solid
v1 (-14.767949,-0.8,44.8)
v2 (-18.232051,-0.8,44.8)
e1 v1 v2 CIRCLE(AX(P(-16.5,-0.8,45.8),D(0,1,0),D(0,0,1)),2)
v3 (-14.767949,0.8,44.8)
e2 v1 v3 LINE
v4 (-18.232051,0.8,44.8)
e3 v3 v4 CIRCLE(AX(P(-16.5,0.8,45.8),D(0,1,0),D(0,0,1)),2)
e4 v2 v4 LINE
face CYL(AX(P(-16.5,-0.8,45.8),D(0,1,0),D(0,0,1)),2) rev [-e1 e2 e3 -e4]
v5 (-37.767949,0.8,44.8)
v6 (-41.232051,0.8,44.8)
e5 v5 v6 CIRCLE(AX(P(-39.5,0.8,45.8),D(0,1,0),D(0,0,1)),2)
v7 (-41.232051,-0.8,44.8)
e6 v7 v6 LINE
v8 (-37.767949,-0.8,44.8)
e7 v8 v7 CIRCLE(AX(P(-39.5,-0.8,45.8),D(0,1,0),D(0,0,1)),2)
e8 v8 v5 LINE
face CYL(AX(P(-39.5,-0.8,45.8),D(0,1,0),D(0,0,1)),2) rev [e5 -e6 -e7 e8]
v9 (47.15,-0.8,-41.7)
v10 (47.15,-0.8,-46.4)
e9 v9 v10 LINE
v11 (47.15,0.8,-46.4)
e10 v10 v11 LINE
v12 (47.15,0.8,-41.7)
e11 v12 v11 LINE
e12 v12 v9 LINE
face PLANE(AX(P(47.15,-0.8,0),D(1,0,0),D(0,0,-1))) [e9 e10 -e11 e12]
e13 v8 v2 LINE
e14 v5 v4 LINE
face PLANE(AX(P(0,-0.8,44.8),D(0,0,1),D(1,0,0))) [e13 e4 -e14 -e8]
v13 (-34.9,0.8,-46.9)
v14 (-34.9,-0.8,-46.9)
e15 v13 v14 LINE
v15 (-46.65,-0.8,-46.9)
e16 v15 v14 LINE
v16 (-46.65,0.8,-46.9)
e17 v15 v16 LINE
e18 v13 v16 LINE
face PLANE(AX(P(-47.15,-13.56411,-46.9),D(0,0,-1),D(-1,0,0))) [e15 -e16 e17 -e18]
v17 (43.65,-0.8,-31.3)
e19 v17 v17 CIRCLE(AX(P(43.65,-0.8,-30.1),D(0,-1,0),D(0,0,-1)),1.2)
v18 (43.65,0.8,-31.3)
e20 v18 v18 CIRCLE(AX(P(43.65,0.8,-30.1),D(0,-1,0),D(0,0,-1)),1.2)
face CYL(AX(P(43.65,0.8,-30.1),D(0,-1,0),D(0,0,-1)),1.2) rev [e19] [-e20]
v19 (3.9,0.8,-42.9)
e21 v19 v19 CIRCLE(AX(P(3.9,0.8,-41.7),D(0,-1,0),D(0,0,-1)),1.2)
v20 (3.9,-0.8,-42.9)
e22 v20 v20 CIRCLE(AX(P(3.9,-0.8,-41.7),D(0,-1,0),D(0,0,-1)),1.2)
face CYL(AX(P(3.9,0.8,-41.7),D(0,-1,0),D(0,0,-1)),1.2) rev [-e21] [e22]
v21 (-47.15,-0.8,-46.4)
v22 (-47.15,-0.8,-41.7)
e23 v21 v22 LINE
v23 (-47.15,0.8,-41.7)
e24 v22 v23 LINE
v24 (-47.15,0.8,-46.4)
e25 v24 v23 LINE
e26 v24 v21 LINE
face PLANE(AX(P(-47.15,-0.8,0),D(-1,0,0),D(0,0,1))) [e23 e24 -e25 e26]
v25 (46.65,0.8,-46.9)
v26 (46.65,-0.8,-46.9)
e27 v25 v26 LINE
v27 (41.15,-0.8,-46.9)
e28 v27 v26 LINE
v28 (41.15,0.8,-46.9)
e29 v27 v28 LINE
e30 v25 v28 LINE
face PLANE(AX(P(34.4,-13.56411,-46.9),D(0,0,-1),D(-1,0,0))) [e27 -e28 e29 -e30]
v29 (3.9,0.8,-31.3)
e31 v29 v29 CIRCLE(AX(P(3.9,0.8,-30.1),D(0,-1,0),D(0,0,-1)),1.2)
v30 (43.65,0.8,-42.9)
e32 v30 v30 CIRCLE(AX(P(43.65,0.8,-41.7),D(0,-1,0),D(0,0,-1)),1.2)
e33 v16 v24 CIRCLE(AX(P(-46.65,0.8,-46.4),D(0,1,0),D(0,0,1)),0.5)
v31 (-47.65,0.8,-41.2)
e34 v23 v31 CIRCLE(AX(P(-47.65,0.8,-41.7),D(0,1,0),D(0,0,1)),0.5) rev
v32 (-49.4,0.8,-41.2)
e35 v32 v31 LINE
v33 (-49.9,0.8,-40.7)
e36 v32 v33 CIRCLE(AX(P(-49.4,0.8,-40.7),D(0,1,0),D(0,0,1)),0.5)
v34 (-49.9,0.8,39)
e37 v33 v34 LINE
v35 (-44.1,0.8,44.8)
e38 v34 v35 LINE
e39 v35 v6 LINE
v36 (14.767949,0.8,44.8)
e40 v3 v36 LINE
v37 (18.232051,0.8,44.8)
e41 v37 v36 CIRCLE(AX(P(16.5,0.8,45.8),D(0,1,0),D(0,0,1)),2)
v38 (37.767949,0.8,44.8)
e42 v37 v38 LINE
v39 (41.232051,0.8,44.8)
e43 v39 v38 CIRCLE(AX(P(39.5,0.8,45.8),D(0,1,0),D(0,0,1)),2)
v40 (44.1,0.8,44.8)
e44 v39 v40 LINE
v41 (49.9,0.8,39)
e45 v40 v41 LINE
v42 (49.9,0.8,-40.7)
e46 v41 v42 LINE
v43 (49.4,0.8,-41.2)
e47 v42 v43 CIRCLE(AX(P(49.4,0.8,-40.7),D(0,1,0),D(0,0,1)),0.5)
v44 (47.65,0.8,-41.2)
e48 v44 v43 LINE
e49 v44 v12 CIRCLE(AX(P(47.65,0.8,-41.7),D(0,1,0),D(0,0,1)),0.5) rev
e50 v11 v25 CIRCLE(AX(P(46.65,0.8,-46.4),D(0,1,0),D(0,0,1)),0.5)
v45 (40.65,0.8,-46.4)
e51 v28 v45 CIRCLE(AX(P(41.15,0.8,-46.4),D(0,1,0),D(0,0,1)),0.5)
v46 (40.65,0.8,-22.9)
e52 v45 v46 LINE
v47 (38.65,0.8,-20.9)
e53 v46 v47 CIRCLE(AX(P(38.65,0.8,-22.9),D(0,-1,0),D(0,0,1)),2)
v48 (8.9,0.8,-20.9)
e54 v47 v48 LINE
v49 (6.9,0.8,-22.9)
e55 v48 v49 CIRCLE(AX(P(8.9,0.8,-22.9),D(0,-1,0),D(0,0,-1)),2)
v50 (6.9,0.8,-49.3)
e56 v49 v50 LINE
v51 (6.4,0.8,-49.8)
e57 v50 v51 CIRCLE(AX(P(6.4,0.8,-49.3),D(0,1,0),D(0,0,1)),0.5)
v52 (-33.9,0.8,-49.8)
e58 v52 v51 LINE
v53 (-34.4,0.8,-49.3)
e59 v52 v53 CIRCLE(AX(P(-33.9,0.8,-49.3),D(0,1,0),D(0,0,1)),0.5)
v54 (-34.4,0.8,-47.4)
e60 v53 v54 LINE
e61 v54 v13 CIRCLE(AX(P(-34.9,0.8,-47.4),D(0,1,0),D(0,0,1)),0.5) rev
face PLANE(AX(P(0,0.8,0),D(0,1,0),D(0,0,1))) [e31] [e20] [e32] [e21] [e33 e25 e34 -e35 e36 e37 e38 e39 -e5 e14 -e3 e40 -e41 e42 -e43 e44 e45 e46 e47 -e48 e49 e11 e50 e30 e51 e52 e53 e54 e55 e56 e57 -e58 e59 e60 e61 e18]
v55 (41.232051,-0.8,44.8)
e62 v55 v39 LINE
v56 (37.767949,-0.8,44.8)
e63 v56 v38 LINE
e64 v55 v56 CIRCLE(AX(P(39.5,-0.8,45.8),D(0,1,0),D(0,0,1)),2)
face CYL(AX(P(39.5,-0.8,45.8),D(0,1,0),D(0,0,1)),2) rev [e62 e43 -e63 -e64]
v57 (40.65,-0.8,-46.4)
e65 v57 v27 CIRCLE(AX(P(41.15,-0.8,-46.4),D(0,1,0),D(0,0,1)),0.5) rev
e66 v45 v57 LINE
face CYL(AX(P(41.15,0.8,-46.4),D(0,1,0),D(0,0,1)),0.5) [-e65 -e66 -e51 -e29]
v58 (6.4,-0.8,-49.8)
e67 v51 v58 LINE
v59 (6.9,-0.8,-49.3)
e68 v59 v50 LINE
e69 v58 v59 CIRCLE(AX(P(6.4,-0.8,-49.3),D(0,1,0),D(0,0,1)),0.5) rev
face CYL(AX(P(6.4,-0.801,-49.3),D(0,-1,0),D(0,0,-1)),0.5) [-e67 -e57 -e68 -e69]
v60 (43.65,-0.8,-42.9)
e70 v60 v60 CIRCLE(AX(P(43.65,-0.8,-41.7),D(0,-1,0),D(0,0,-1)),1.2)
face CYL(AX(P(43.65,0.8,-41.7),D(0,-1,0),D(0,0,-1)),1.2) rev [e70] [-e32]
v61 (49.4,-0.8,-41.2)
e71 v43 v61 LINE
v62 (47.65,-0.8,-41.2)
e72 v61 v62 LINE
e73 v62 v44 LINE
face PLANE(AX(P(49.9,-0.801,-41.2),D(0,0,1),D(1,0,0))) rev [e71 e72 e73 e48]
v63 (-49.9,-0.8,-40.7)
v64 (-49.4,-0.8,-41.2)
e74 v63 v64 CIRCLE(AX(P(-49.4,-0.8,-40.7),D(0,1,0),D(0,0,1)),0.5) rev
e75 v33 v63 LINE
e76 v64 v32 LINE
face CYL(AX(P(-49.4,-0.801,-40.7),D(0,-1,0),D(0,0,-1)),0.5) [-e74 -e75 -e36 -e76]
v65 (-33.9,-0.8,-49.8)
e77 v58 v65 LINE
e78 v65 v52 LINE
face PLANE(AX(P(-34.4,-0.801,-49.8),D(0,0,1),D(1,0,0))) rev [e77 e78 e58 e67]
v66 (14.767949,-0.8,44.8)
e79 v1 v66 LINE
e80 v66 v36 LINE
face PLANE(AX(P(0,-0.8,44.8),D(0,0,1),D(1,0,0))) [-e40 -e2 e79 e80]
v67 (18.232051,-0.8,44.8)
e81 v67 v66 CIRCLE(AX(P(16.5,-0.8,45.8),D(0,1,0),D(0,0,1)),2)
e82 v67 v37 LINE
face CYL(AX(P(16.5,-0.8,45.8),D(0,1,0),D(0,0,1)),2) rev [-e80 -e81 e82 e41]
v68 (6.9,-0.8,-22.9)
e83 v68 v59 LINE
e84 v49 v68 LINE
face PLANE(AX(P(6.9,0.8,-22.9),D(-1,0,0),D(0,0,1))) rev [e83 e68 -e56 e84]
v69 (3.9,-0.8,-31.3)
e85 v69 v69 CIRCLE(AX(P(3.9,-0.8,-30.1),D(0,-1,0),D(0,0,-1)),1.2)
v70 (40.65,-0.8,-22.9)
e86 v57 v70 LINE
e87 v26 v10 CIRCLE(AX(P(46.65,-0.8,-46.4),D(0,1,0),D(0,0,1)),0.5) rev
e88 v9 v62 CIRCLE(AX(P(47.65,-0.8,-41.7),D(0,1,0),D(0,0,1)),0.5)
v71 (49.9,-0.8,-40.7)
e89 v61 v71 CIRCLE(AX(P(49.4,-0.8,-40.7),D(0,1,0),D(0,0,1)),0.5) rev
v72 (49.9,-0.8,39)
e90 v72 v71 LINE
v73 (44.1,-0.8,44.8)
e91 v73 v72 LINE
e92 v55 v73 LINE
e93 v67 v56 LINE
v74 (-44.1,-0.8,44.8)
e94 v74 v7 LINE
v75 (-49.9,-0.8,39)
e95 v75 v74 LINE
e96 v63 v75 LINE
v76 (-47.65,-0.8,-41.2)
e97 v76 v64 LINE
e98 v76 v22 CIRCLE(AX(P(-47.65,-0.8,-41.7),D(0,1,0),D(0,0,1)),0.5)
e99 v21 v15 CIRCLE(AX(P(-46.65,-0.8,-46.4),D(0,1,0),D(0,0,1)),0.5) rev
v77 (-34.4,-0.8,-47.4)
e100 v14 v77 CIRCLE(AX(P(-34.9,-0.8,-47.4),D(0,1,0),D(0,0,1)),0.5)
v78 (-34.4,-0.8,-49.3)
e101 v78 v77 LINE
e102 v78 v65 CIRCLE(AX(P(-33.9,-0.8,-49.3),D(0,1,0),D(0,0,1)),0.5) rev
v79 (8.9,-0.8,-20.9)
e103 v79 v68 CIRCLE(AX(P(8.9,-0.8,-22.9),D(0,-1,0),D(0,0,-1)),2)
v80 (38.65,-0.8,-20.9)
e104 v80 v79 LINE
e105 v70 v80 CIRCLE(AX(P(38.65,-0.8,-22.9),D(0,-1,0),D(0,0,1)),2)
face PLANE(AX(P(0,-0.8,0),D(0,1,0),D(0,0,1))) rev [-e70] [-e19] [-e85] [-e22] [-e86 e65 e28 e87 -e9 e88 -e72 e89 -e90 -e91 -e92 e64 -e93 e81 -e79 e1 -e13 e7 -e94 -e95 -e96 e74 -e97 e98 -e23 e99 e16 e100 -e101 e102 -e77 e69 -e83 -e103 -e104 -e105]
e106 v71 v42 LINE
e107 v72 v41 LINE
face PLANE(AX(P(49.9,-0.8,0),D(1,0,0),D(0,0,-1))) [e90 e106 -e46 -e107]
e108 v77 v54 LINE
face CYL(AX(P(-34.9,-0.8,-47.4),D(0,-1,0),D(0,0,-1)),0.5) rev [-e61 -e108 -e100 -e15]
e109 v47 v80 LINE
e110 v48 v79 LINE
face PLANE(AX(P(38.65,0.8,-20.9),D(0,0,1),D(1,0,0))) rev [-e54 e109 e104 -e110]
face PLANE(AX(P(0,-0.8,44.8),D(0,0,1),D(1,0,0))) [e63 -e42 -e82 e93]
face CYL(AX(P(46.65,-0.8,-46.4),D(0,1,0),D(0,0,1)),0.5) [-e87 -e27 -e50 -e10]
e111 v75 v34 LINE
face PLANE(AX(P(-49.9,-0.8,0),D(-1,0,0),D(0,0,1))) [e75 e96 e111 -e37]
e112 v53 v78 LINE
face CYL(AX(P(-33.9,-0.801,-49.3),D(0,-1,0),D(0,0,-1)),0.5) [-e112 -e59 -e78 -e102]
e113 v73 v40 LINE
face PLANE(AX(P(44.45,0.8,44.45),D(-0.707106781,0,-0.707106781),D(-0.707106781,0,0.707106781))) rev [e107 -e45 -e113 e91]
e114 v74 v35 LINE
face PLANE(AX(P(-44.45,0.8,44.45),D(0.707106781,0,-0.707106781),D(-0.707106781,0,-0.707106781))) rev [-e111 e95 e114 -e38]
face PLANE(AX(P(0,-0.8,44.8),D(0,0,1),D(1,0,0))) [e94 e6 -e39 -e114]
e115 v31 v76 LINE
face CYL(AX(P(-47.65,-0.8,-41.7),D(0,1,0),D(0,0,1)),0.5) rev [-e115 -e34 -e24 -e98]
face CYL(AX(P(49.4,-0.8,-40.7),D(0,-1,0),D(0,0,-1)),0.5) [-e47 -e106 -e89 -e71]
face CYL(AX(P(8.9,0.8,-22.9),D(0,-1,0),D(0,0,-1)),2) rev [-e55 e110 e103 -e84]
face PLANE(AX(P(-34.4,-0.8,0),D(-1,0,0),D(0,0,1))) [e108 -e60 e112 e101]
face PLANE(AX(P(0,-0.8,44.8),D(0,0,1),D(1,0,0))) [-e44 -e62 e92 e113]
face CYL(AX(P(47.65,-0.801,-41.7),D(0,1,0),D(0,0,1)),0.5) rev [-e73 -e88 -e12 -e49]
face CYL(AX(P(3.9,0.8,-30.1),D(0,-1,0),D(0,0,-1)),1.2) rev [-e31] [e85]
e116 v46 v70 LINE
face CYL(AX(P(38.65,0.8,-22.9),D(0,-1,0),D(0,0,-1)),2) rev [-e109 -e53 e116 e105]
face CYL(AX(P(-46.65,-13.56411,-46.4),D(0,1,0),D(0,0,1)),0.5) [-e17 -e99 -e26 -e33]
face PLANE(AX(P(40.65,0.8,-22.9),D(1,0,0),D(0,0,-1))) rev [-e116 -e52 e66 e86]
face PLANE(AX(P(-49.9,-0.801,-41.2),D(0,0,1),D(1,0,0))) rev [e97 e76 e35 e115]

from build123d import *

# Parameters (mm, degrees)
GENERICCARDPCBDEFINITION_START = -0.8
GENERICCARDPCBDEFINITION_DEPTH = 1.6
SKETCH7_R                      = 1.2
CUT_EXTRUDE1_DEPTH             = 71.516735602
FILLET1_R                      = 0.5


# Read off the part's stored shape, not the designer's step: GenericCardPCBDefinition
with BuildPart() as part:
    # GenericCardPCBDefinition outline → GenericCardPCBDefinition (new body)
    with BuildSketch(Plane(origin=(0, 0, 0), x_dir=(1, 0, 0), z_dir=(0, 1, 0)).offset(GENERICCARDPCBDEFINITION_START)):
        with BuildLine():
            Line((-49.9, -39), (-44.1, -44.8))
            Line((-44.1, -44.8), (-41.232050808, -44.8))
            ThreePointArc((-41.232050808, -44.8), (-39.5, -43.8), (-37.767949192, -44.8))
            Line((-37.767949192, -44.8), (-18.232050808, -44.8))
            ThreePointArc((-18.232050808, -44.8), (-16.5, -43.8), (-14.767949192, -44.8))
            Line((-14.767949192, -44.8), (14.767949192, -44.8))
            ThreePointArc((14.767949192, -44.8), (16.5, -43.8), (18.232050808, -44.8))
            Line((18.232050808, -44.8), (37.767949192, -44.8))
            ThreePointArc((37.767949192, -44.8), (39.5, -43.8), (41.232050808, -44.8))
            Line((41.232050808, -44.8), (44.1, -44.8))
            Line((44.1, -44.8), (49.9, -39))
            Line((49.9, -39), (49.9, 40.7))
            ThreePointArc((49.9, 40.7), (49.753553391, 41.053553391), (49.4, 41.2))
            Line((49.4, 41.2), (47.65, 41.2))
            ThreePointArc((47.65, 41.2), (47.296446609, 41.346446609), (47.15, 41.7))
            Line((47.15, 41.7), (47.15, 46.4))
            ThreePointArc((47.15, 46.4), (47.003553391, 46.753553391), (46.65, 46.9))
            Line((46.65, 46.9), (34.9, 46.9))
            ThreePointArc((34.9, 46.9), (34.546446609, 47.046446609), (34.4, 47.4))
            Line((34.4, 47.4), (34.4, 49.3))
            ThreePointArc((34.4, 49.3), (34.253553391, 49.653553391), (33.9, 49.8))
            Line((33.9, 49.8), (-33.9, 49.8))
            ThreePointArc((-33.9, 49.8), (-34.253553391, 49.653553391), (-34.4, 49.3))
            Line((-34.4, 49.3), (-34.4, 47.4))
            ThreePointArc((-34.4, 47.4), (-34.546446609, 47.046446609), (-34.9, 46.9))
            Line((-34.9, 46.9), (-46.65, 46.9))
            ThreePointArc((-46.65, 46.9), (-47.003553391, 46.753553391), (-47.15, 46.4))
            Line((-47.15, 46.4), (-47.15, 41.7))
            ThreePointArc((-47.15, 41.7), (-47.296446609, 41.346446609), (-47.65, 41.2))
            Line((-47.65, 41.2), (-49.4, 41.2))
            ThreePointArc((-49.4, 41.2), (-49.753553391, 41.053553391), (-49.9, 40.7))
            Line((-49.9, 40.7), (-49.9, -39))
        make_face()
    extrude(amount=GENERICCARDPCBDEFINITION_DEPTH)

    # Sketch7 → Cut-Extrude1 (cut, through all)
    with BuildSketch(Plane.XZ.offset(0.8)):
        with Locations(Location((3.9, -41.7, 0), (0, 0, 270))):
            Circle(SKETCH7_R)
        with Locations(Location((3.9, -30.1, 0), (0, 0, 270))):
            Circle(SKETCH7_R)
        with Locations(Location((43.65, -41.7, 0), (0, 0, 270))):
            Circle(SKETCH7_R)
        with Locations(Location((43.65, -30.1, 0), (0, 0, 270))):
            Circle(SKETCH7_R)
        with BuildLine():
            Line((38.65, -20.9), (8.9, -20.9))
            ThreePointArc((8.9, -20.9), (7.485786438, -21.485786438), (6.9, -22.9))
            Line((6.9, -22.9), (6.9, -49.8))
            Line((6.9, -49.8), (40.65, -49.8))
            Line((40.65, -49.8), (40.65, -22.9))
            ThreePointArc((40.65, -22.9), (40.064213562, -21.485786438), (38.65, -20.9))
        make_face()
    extrude(amount=-CUT_EXTRUDE1_DEPTH, mode=Mode.SUBTRACT)

    # Fillet1
    fillet1_edges = [part.edges().sort_by_distance(p)[0] for p in [
        (40.65, 0, -46.9),
        (6.9, 0, -49.8),
    ]]
    fillet(fillet1_edges, radius=FILLET1_R)


solid = part.part
